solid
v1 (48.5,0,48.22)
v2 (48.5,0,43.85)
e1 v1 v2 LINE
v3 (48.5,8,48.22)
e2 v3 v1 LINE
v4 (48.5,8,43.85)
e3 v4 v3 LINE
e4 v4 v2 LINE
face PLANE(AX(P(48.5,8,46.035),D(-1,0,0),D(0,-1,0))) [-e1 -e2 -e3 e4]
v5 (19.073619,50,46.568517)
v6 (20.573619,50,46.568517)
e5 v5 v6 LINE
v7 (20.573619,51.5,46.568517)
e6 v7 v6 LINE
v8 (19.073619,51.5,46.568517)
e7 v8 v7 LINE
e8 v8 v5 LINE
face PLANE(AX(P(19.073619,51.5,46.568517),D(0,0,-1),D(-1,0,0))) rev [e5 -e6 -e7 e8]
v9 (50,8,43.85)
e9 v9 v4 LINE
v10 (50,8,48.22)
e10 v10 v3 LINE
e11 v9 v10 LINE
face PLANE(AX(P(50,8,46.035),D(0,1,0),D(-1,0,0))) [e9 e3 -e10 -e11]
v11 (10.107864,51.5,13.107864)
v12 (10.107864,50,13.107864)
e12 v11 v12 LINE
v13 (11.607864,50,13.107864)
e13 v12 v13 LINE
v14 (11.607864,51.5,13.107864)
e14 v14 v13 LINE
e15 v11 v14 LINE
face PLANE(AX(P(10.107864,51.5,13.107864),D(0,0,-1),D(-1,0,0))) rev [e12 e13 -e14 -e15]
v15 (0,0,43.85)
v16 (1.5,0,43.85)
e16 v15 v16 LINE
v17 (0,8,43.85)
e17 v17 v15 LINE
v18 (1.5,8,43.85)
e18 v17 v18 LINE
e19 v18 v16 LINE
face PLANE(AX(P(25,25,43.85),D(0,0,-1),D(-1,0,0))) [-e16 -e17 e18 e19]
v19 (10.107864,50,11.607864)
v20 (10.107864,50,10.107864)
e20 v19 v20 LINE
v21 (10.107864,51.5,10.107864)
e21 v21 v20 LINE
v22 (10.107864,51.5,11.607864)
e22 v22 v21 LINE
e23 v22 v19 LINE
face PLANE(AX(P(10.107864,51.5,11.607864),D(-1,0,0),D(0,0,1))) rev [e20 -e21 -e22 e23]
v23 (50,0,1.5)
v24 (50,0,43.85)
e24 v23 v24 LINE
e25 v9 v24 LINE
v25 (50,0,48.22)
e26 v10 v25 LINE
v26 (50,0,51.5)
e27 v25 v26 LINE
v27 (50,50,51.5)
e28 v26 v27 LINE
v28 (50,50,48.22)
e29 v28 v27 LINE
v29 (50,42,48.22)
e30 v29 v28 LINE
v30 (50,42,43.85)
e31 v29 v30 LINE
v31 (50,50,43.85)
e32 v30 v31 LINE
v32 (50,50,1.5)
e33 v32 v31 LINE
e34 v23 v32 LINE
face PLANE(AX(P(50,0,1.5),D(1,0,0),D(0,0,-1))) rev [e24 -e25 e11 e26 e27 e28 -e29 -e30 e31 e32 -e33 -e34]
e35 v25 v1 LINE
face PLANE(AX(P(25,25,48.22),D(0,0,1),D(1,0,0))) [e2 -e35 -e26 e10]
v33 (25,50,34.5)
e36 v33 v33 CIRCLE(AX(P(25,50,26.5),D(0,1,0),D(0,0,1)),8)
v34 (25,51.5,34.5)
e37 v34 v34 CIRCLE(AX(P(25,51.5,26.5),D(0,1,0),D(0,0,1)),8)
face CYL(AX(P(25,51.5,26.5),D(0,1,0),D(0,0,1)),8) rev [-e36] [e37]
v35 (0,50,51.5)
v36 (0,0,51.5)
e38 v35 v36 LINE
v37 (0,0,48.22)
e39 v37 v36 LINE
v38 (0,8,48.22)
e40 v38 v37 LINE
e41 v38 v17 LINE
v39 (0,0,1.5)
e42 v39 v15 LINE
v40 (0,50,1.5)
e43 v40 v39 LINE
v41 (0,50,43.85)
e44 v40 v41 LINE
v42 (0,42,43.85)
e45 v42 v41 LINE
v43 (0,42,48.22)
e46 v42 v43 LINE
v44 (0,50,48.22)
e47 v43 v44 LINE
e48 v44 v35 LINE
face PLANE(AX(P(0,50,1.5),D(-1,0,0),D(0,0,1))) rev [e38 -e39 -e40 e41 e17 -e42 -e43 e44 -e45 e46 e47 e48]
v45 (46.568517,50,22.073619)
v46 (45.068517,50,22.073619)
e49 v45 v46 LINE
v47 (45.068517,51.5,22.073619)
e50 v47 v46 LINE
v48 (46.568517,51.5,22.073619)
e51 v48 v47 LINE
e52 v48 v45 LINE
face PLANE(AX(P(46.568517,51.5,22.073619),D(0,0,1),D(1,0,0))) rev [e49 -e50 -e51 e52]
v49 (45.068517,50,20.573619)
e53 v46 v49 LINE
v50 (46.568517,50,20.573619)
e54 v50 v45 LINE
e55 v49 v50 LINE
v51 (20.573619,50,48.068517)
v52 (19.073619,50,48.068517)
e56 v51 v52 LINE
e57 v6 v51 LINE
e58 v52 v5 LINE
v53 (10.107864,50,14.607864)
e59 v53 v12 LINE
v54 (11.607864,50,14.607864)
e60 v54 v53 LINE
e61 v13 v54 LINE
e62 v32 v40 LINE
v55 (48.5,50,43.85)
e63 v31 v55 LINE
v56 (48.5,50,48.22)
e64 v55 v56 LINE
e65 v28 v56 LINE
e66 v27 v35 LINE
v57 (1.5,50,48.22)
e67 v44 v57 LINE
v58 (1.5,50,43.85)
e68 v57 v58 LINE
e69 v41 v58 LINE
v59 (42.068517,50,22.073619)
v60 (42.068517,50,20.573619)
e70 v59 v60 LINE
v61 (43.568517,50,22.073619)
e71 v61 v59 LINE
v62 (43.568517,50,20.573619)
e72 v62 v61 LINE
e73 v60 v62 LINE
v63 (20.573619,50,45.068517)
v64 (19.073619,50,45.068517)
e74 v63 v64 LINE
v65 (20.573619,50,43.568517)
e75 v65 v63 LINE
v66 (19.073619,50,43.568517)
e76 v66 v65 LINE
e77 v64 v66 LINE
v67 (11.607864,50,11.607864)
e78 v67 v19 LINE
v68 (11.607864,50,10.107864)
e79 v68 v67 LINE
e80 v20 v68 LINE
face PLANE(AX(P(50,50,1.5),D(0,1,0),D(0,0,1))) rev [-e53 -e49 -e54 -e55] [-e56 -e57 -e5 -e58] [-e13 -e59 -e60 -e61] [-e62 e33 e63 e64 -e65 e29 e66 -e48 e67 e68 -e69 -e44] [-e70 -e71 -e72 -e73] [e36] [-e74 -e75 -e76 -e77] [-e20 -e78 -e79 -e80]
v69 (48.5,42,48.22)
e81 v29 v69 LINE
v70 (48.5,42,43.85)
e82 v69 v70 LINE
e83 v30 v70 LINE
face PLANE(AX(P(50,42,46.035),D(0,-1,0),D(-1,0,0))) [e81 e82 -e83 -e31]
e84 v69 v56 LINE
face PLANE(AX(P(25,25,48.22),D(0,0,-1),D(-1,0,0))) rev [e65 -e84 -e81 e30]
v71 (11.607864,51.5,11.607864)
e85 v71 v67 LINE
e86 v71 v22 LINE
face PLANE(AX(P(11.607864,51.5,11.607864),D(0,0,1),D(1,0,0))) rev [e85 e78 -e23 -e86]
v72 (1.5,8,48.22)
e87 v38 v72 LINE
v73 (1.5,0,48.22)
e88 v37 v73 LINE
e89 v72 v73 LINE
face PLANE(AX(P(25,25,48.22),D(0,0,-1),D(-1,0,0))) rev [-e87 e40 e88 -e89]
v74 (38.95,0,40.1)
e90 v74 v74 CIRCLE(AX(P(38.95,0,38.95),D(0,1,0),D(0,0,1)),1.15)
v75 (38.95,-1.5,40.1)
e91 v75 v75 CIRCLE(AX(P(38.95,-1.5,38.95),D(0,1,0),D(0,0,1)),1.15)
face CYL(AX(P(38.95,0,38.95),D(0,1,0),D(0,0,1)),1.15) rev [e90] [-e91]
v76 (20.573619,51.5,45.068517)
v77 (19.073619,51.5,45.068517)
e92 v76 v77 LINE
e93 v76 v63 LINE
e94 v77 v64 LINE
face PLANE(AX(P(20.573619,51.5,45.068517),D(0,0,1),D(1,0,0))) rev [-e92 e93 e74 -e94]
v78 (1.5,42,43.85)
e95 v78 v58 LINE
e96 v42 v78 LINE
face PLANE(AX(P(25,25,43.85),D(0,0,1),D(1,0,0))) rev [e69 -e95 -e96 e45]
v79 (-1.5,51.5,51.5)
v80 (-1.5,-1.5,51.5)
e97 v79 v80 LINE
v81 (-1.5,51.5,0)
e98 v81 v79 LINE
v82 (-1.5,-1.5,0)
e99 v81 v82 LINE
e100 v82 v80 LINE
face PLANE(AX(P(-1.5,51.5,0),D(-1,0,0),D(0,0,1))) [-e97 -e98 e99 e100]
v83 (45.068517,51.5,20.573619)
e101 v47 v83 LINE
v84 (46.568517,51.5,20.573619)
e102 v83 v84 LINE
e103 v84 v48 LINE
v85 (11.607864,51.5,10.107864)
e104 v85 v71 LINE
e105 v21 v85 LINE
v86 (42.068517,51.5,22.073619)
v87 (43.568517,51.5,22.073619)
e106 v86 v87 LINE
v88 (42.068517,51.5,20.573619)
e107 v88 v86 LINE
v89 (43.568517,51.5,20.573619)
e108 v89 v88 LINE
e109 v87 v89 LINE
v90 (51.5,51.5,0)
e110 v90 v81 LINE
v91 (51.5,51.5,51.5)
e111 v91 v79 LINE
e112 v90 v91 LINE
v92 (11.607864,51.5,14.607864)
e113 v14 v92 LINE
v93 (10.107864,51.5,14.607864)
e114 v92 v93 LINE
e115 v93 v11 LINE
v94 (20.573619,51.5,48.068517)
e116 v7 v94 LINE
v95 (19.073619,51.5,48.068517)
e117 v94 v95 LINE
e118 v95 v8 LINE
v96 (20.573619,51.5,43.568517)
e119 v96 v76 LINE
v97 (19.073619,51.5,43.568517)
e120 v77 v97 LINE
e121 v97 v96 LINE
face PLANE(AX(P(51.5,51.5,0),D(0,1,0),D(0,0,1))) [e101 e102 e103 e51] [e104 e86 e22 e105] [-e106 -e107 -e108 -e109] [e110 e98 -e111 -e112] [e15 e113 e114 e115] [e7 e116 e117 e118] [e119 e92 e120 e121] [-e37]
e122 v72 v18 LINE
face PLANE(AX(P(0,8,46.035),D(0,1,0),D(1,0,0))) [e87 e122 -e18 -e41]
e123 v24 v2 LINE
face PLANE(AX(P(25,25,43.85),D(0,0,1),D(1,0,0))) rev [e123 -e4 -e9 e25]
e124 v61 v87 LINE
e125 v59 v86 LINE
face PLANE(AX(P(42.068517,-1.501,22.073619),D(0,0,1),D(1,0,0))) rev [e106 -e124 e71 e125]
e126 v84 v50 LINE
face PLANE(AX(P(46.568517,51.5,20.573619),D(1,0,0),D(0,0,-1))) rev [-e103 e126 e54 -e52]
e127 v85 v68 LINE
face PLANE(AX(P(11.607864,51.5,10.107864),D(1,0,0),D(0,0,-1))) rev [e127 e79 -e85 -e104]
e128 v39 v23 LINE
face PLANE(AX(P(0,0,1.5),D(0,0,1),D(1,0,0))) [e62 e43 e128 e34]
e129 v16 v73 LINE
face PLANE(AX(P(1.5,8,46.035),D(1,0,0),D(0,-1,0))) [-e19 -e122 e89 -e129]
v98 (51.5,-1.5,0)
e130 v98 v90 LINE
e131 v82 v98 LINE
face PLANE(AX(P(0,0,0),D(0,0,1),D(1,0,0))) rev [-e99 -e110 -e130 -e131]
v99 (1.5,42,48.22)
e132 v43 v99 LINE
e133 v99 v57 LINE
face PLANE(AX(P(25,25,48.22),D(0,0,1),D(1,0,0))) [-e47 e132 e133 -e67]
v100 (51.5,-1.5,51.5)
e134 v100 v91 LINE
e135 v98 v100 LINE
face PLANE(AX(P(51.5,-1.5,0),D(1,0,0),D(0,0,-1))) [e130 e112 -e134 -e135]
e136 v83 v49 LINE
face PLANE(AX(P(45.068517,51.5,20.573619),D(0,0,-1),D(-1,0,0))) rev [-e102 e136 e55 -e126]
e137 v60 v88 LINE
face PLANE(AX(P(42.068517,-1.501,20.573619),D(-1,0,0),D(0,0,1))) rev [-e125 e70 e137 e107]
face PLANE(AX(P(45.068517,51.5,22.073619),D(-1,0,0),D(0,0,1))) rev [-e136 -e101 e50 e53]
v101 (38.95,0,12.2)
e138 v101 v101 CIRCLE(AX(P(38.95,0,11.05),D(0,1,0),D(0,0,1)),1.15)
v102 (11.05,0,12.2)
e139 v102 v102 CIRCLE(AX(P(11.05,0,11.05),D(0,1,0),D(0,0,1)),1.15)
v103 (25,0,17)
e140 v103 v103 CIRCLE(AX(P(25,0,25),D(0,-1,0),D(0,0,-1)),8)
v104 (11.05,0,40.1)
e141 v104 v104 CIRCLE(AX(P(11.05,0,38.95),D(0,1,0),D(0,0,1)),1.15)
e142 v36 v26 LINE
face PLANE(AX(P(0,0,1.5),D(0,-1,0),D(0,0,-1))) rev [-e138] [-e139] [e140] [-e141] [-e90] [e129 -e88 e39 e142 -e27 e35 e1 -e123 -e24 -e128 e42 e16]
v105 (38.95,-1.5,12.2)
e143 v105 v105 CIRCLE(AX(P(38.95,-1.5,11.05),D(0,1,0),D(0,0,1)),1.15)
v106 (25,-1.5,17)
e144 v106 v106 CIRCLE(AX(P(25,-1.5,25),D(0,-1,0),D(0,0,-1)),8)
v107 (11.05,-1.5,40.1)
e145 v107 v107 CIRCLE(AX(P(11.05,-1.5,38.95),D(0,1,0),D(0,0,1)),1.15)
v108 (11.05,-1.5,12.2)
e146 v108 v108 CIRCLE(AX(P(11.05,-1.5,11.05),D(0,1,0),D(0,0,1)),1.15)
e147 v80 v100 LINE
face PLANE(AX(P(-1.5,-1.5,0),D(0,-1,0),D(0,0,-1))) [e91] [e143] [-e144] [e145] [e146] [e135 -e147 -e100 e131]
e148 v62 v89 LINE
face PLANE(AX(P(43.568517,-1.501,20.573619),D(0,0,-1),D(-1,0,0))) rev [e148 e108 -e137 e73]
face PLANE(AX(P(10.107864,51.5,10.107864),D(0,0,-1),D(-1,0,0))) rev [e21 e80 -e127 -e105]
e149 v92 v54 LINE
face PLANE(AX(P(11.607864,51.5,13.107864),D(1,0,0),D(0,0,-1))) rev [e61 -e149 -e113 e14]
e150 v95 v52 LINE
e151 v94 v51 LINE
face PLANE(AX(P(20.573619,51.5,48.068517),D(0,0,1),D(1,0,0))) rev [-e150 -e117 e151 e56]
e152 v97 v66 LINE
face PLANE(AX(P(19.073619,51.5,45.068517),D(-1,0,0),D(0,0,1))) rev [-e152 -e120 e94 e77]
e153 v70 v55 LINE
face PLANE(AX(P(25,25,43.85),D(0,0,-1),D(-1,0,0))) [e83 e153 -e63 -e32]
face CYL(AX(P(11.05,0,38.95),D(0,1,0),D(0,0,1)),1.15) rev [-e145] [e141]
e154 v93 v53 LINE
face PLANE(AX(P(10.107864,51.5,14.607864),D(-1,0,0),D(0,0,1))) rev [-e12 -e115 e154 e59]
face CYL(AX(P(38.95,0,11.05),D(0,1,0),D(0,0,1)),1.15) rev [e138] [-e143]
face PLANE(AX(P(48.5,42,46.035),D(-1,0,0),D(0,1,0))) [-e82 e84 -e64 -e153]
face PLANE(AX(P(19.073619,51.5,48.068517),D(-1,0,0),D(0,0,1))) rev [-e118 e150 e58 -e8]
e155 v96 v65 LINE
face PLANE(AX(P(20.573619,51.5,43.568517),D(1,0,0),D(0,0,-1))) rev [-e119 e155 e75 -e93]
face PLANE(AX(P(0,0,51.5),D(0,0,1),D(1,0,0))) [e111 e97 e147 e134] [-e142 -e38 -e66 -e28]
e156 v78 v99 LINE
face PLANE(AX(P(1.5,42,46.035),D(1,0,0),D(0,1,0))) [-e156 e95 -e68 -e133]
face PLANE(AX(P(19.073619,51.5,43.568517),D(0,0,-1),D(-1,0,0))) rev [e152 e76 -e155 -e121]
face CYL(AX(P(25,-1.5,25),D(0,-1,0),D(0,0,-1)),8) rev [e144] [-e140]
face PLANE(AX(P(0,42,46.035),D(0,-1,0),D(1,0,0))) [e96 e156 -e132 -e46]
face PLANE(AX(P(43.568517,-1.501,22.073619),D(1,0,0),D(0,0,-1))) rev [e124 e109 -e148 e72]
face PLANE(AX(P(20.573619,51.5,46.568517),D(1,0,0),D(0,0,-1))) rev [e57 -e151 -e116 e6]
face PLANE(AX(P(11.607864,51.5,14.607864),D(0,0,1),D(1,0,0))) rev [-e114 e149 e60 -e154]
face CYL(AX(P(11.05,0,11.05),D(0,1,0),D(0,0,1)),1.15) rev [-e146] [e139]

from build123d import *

# Parameters (mm, degrees)
SKETCH1_W                      = 53
SKETCH1_H                      = 53
BOSS_EXTRUDE1_DEPTH            = 51.5
SKETCH2_W                      = 50
SKETCH2_H                      = 50
CUT_EXTRUDE1_DEPTH             = 50
SKETCH3_W                      = 1.5
SKETCH3_H                      = 1.5
CUT_EXTRUDE2_DEPTH             = 90.20061659
SKETCH4_W                      = 1.5
SKETCH4_H                      = 1.5
CUT_EXTRUDE3_DEPTH             = 90.20061659
SKETCH5_W                      = 1.5
SKETCH5_H                      = 1.5
CUT_EXTRUDE4_DEPTH             = 90.20061659
SKETCH6_W                      = 1.5
SKETCH6_H                      = 1.5
CUT_EXTRUDE5_DEPTH             = 90.20061659
SKETCH7_W                      = 1.5
SKETCH7_H                      = 1.5
CUT_EXTRUDE6_DEPTH             = 90.20061659
CUT_EXTRUDE7_REACH             = 92.075
SKETCH8_W                      = 1.5
SKETCH8_H                      = 1.5
F_16_0_16_DIAMETER_HOLE1_D     = 16
F_16_0_16_DIAMETER_HOLE1_DEPTH = 1.5
F_2_3_2_3_DIAMETER_HOLE1_D     = 2.3
F_2_3_2_3_DIAMETER_HOLE1_DEPTH = 1.5
F_16_0_16_DIAMETER_HOLE2_D     = 16
F_16_0_16_DIAMETER_HOLE2_DEPTH = 1.5
RIB1_START                     = -2.185
RIB1_OUTLINE_W                 = 1.5
RIB1_OUTLINE_H                 = 8
RIB1_DEPTH                     = 4.37
RIB2_START                     = -2.185
RIB2_OUTLINE_W                 = 1.5
RIB2_OUTLINE_H                 = 8
RIB2_DEPTH                     = 4.37
RIB3_START                     = -2.185
RIB3_OUTLINE_W                 = 1.5
RIB3_OUTLINE_H                 = 8
RIB3_DEPTH                     = 4.37
RIB4_START                     = -2.185
RIB4_OUTLINE_W                 = 1.5
RIB4_OUTLINE_H                 = 8
RIB4_DEPTH                     = 4.37


# Read off the part's stored shape, not the designer's step: Rib1, Rib2, Rib3, Rib4
with BuildPart() as part:
    # Sketch1 → Boss-Extrude1 (new body)
    with BuildSketch(Plane.XY.offset(51.5)):
        with Locations((25, 25)):
            Rectangle(SKETCH1_W, SKETCH1_H)
    extrude(amount=-BOSS_EXTRUDE1_DEPTH)

    # Sketch2 → Cut-Extrude1 (cut)
    with BuildSketch(Plane.XY.offset(51.5)):
        with Locations((25, 25)):
            Rectangle(SKETCH2_W, SKETCH2_H)
    extrude(amount=-CUT_EXTRUDE1_DEPTH, mode=Mode.SUBTRACT)

    # Sketch3 → Cut-Extrude2 (cut, through all)
    with BuildSketch(Plane.XZ.offset(-50)):
        with Locations((45.818516526, 21.323619098)):
            Rectangle(SKETCH3_W, SKETCH3_H)
    extrude(amount=-CUT_EXTRUDE2_DEPTH, mode=Mode.SUBTRACT)

    # Sketch4 → Cut-Extrude3 (cut, through all)
    with BuildSketch(Plane.XZ.offset(-50)):
        with Locations((10.857864376, 13.857864376)):
            Rectangle(SKETCH4_W, SKETCH4_H)
    extrude(amount=-CUT_EXTRUDE3_DEPTH, mode=Mode.SUBTRACT)

    # Sketch5 → Cut-Extrude4 (cut, through all)
    with BuildSketch(Plane.XZ.offset(-50)):
        with Locations((19.823619098, 47.318516526)):
            Rectangle(SKETCH5_W, SKETCH5_H)
    extrude(amount=-CUT_EXTRUDE4_DEPTH, mode=Mode.SUBTRACT)

    # Sketch6 → Cut-Extrude5 (cut, through all)
    with BuildSketch(Plane.XZ.offset(-50)):
        with Locations((19.823619098, 44.318516526)):
            Rectangle(SKETCH6_W, SKETCH6_H)
    extrude(amount=-CUT_EXTRUDE5_DEPTH, mode=Mode.SUBTRACT)

    # Sketch7 → Cut-Extrude6 (cut, through all)
    with BuildSketch(Plane.XZ.offset(-50)):
        with Locations((10.857864376, 10.857864376)):
            Rectangle(SKETCH7_W, SKETCH7_H)
    extrude(amount=-CUT_EXTRUDE6_DEPTH, mode=Mode.SUBTRACT)

    # Sketch8 → Cut-Extrude7 (cut, up to next)
    with BuildSketch(Plane(origin=(0, 51.5, 0), x_dir=(-1, 0, 0), z_dir=(0, 1, 0)), mode=Mode.PRIVATE) as cut_extrude7_sk1:
        with Locations((-42.818516526, 21.323619098)):
            Rectangle(SKETCH8_W, SKETCH8_H)
    cut_extrude7_tool1 = extrude(cut_extrude7_sk1.sketch, amount=-CUT_EXTRUDE7_REACH, mode=Mode.PRIVATE) & part.part
    add(cut_extrude7_tool1.solids().sort_by_distance((42.818517, 51.5, 21.323619))[0], mode=Mode.SUBTRACT)

    # Ø16.0 (16) Diameter Hole1
    with Locations(Plane(origin=(0, -1.5, 0), x_dir=(-1, 0, 0), z_dir=(0, -1, 0))):
        with Locations((-25, -25)):
            Hole(F_16_0_16_DIAMETER_HOLE1_D / 2, depth=F_16_0_16_DIAMETER_HOLE1_DEPTH)

    # Ø2.3 (2.3) Diameter Hole1
    with Locations(Plane(origin=(0, 0, 0), x_dir=(1, 0, 0), z_dir=(0, 1, 0))):
        with Locations((38.95, -11.05), (11.05, -11.05), (11.05, -38.95), (38.95, -38.95)):
            Hole(F_2_3_2_3_DIAMETER_HOLE1_D / 2, depth=F_2_3_2_3_DIAMETER_HOLE1_DEPTH)

    # Ø16.0 (16) Diameter Hole2
    with Locations(Plane(origin=(0, 51.5, 0), x_dir=(1, 0, 0), z_dir=(0, 1, 0))):
        with Locations((25, -26.5)):
            Hole(F_16_0_16_DIAMETER_HOLE2_D / 2, depth=F_16_0_16_DIAMETER_HOLE2_DEPTH)

    # Rib1 outline → Rib1 (add)
    with BuildSketch(Plane(origin=(0, 0, 46.035), x_dir=(-1, 0, 0), z_dir=(0, 0, -1)).offset(RIB1_START)):
        with Locations((-49.25, 46)):
            Rectangle(RIB1_OUTLINE_W, RIB1_OUTLINE_H)
    extrude(amount=RIB1_DEPTH)

    # Rib2 outline → Rib2 (add)
    with BuildSketch(Plane(origin=(0, 0, 46.035), x_dir=(-1, 0, 0), z_dir=(0, 0, -1)).offset(RIB2_START)):
        with Locations((-0.75, 4)):
            Rectangle(RIB2_OUTLINE_W, RIB2_OUTLINE_H)
    extrude(amount=RIB2_DEPTH)

    # Rib3 outline → Rib3 (add)
    with BuildSketch(Plane.XY.offset(46.035).offset(RIB3_START)):
        with Locations((0.75, 46)):
            Rectangle(RIB3_OUTLINE_W, RIB3_OUTLINE_H)
    extrude(amount=RIB3_DEPTH)

    # Rib4 outline → Rib4 (add)
    with BuildSketch(Plane.XY.offset(46.035).offset(RIB4_START)):
        with Locations((49.25, 4)):
            Rectangle(RIB4_OUTLINE_W, RIB4_OUTLINE_H)
    extrude(amount=RIB4_DEPTH)


solid = part.part
